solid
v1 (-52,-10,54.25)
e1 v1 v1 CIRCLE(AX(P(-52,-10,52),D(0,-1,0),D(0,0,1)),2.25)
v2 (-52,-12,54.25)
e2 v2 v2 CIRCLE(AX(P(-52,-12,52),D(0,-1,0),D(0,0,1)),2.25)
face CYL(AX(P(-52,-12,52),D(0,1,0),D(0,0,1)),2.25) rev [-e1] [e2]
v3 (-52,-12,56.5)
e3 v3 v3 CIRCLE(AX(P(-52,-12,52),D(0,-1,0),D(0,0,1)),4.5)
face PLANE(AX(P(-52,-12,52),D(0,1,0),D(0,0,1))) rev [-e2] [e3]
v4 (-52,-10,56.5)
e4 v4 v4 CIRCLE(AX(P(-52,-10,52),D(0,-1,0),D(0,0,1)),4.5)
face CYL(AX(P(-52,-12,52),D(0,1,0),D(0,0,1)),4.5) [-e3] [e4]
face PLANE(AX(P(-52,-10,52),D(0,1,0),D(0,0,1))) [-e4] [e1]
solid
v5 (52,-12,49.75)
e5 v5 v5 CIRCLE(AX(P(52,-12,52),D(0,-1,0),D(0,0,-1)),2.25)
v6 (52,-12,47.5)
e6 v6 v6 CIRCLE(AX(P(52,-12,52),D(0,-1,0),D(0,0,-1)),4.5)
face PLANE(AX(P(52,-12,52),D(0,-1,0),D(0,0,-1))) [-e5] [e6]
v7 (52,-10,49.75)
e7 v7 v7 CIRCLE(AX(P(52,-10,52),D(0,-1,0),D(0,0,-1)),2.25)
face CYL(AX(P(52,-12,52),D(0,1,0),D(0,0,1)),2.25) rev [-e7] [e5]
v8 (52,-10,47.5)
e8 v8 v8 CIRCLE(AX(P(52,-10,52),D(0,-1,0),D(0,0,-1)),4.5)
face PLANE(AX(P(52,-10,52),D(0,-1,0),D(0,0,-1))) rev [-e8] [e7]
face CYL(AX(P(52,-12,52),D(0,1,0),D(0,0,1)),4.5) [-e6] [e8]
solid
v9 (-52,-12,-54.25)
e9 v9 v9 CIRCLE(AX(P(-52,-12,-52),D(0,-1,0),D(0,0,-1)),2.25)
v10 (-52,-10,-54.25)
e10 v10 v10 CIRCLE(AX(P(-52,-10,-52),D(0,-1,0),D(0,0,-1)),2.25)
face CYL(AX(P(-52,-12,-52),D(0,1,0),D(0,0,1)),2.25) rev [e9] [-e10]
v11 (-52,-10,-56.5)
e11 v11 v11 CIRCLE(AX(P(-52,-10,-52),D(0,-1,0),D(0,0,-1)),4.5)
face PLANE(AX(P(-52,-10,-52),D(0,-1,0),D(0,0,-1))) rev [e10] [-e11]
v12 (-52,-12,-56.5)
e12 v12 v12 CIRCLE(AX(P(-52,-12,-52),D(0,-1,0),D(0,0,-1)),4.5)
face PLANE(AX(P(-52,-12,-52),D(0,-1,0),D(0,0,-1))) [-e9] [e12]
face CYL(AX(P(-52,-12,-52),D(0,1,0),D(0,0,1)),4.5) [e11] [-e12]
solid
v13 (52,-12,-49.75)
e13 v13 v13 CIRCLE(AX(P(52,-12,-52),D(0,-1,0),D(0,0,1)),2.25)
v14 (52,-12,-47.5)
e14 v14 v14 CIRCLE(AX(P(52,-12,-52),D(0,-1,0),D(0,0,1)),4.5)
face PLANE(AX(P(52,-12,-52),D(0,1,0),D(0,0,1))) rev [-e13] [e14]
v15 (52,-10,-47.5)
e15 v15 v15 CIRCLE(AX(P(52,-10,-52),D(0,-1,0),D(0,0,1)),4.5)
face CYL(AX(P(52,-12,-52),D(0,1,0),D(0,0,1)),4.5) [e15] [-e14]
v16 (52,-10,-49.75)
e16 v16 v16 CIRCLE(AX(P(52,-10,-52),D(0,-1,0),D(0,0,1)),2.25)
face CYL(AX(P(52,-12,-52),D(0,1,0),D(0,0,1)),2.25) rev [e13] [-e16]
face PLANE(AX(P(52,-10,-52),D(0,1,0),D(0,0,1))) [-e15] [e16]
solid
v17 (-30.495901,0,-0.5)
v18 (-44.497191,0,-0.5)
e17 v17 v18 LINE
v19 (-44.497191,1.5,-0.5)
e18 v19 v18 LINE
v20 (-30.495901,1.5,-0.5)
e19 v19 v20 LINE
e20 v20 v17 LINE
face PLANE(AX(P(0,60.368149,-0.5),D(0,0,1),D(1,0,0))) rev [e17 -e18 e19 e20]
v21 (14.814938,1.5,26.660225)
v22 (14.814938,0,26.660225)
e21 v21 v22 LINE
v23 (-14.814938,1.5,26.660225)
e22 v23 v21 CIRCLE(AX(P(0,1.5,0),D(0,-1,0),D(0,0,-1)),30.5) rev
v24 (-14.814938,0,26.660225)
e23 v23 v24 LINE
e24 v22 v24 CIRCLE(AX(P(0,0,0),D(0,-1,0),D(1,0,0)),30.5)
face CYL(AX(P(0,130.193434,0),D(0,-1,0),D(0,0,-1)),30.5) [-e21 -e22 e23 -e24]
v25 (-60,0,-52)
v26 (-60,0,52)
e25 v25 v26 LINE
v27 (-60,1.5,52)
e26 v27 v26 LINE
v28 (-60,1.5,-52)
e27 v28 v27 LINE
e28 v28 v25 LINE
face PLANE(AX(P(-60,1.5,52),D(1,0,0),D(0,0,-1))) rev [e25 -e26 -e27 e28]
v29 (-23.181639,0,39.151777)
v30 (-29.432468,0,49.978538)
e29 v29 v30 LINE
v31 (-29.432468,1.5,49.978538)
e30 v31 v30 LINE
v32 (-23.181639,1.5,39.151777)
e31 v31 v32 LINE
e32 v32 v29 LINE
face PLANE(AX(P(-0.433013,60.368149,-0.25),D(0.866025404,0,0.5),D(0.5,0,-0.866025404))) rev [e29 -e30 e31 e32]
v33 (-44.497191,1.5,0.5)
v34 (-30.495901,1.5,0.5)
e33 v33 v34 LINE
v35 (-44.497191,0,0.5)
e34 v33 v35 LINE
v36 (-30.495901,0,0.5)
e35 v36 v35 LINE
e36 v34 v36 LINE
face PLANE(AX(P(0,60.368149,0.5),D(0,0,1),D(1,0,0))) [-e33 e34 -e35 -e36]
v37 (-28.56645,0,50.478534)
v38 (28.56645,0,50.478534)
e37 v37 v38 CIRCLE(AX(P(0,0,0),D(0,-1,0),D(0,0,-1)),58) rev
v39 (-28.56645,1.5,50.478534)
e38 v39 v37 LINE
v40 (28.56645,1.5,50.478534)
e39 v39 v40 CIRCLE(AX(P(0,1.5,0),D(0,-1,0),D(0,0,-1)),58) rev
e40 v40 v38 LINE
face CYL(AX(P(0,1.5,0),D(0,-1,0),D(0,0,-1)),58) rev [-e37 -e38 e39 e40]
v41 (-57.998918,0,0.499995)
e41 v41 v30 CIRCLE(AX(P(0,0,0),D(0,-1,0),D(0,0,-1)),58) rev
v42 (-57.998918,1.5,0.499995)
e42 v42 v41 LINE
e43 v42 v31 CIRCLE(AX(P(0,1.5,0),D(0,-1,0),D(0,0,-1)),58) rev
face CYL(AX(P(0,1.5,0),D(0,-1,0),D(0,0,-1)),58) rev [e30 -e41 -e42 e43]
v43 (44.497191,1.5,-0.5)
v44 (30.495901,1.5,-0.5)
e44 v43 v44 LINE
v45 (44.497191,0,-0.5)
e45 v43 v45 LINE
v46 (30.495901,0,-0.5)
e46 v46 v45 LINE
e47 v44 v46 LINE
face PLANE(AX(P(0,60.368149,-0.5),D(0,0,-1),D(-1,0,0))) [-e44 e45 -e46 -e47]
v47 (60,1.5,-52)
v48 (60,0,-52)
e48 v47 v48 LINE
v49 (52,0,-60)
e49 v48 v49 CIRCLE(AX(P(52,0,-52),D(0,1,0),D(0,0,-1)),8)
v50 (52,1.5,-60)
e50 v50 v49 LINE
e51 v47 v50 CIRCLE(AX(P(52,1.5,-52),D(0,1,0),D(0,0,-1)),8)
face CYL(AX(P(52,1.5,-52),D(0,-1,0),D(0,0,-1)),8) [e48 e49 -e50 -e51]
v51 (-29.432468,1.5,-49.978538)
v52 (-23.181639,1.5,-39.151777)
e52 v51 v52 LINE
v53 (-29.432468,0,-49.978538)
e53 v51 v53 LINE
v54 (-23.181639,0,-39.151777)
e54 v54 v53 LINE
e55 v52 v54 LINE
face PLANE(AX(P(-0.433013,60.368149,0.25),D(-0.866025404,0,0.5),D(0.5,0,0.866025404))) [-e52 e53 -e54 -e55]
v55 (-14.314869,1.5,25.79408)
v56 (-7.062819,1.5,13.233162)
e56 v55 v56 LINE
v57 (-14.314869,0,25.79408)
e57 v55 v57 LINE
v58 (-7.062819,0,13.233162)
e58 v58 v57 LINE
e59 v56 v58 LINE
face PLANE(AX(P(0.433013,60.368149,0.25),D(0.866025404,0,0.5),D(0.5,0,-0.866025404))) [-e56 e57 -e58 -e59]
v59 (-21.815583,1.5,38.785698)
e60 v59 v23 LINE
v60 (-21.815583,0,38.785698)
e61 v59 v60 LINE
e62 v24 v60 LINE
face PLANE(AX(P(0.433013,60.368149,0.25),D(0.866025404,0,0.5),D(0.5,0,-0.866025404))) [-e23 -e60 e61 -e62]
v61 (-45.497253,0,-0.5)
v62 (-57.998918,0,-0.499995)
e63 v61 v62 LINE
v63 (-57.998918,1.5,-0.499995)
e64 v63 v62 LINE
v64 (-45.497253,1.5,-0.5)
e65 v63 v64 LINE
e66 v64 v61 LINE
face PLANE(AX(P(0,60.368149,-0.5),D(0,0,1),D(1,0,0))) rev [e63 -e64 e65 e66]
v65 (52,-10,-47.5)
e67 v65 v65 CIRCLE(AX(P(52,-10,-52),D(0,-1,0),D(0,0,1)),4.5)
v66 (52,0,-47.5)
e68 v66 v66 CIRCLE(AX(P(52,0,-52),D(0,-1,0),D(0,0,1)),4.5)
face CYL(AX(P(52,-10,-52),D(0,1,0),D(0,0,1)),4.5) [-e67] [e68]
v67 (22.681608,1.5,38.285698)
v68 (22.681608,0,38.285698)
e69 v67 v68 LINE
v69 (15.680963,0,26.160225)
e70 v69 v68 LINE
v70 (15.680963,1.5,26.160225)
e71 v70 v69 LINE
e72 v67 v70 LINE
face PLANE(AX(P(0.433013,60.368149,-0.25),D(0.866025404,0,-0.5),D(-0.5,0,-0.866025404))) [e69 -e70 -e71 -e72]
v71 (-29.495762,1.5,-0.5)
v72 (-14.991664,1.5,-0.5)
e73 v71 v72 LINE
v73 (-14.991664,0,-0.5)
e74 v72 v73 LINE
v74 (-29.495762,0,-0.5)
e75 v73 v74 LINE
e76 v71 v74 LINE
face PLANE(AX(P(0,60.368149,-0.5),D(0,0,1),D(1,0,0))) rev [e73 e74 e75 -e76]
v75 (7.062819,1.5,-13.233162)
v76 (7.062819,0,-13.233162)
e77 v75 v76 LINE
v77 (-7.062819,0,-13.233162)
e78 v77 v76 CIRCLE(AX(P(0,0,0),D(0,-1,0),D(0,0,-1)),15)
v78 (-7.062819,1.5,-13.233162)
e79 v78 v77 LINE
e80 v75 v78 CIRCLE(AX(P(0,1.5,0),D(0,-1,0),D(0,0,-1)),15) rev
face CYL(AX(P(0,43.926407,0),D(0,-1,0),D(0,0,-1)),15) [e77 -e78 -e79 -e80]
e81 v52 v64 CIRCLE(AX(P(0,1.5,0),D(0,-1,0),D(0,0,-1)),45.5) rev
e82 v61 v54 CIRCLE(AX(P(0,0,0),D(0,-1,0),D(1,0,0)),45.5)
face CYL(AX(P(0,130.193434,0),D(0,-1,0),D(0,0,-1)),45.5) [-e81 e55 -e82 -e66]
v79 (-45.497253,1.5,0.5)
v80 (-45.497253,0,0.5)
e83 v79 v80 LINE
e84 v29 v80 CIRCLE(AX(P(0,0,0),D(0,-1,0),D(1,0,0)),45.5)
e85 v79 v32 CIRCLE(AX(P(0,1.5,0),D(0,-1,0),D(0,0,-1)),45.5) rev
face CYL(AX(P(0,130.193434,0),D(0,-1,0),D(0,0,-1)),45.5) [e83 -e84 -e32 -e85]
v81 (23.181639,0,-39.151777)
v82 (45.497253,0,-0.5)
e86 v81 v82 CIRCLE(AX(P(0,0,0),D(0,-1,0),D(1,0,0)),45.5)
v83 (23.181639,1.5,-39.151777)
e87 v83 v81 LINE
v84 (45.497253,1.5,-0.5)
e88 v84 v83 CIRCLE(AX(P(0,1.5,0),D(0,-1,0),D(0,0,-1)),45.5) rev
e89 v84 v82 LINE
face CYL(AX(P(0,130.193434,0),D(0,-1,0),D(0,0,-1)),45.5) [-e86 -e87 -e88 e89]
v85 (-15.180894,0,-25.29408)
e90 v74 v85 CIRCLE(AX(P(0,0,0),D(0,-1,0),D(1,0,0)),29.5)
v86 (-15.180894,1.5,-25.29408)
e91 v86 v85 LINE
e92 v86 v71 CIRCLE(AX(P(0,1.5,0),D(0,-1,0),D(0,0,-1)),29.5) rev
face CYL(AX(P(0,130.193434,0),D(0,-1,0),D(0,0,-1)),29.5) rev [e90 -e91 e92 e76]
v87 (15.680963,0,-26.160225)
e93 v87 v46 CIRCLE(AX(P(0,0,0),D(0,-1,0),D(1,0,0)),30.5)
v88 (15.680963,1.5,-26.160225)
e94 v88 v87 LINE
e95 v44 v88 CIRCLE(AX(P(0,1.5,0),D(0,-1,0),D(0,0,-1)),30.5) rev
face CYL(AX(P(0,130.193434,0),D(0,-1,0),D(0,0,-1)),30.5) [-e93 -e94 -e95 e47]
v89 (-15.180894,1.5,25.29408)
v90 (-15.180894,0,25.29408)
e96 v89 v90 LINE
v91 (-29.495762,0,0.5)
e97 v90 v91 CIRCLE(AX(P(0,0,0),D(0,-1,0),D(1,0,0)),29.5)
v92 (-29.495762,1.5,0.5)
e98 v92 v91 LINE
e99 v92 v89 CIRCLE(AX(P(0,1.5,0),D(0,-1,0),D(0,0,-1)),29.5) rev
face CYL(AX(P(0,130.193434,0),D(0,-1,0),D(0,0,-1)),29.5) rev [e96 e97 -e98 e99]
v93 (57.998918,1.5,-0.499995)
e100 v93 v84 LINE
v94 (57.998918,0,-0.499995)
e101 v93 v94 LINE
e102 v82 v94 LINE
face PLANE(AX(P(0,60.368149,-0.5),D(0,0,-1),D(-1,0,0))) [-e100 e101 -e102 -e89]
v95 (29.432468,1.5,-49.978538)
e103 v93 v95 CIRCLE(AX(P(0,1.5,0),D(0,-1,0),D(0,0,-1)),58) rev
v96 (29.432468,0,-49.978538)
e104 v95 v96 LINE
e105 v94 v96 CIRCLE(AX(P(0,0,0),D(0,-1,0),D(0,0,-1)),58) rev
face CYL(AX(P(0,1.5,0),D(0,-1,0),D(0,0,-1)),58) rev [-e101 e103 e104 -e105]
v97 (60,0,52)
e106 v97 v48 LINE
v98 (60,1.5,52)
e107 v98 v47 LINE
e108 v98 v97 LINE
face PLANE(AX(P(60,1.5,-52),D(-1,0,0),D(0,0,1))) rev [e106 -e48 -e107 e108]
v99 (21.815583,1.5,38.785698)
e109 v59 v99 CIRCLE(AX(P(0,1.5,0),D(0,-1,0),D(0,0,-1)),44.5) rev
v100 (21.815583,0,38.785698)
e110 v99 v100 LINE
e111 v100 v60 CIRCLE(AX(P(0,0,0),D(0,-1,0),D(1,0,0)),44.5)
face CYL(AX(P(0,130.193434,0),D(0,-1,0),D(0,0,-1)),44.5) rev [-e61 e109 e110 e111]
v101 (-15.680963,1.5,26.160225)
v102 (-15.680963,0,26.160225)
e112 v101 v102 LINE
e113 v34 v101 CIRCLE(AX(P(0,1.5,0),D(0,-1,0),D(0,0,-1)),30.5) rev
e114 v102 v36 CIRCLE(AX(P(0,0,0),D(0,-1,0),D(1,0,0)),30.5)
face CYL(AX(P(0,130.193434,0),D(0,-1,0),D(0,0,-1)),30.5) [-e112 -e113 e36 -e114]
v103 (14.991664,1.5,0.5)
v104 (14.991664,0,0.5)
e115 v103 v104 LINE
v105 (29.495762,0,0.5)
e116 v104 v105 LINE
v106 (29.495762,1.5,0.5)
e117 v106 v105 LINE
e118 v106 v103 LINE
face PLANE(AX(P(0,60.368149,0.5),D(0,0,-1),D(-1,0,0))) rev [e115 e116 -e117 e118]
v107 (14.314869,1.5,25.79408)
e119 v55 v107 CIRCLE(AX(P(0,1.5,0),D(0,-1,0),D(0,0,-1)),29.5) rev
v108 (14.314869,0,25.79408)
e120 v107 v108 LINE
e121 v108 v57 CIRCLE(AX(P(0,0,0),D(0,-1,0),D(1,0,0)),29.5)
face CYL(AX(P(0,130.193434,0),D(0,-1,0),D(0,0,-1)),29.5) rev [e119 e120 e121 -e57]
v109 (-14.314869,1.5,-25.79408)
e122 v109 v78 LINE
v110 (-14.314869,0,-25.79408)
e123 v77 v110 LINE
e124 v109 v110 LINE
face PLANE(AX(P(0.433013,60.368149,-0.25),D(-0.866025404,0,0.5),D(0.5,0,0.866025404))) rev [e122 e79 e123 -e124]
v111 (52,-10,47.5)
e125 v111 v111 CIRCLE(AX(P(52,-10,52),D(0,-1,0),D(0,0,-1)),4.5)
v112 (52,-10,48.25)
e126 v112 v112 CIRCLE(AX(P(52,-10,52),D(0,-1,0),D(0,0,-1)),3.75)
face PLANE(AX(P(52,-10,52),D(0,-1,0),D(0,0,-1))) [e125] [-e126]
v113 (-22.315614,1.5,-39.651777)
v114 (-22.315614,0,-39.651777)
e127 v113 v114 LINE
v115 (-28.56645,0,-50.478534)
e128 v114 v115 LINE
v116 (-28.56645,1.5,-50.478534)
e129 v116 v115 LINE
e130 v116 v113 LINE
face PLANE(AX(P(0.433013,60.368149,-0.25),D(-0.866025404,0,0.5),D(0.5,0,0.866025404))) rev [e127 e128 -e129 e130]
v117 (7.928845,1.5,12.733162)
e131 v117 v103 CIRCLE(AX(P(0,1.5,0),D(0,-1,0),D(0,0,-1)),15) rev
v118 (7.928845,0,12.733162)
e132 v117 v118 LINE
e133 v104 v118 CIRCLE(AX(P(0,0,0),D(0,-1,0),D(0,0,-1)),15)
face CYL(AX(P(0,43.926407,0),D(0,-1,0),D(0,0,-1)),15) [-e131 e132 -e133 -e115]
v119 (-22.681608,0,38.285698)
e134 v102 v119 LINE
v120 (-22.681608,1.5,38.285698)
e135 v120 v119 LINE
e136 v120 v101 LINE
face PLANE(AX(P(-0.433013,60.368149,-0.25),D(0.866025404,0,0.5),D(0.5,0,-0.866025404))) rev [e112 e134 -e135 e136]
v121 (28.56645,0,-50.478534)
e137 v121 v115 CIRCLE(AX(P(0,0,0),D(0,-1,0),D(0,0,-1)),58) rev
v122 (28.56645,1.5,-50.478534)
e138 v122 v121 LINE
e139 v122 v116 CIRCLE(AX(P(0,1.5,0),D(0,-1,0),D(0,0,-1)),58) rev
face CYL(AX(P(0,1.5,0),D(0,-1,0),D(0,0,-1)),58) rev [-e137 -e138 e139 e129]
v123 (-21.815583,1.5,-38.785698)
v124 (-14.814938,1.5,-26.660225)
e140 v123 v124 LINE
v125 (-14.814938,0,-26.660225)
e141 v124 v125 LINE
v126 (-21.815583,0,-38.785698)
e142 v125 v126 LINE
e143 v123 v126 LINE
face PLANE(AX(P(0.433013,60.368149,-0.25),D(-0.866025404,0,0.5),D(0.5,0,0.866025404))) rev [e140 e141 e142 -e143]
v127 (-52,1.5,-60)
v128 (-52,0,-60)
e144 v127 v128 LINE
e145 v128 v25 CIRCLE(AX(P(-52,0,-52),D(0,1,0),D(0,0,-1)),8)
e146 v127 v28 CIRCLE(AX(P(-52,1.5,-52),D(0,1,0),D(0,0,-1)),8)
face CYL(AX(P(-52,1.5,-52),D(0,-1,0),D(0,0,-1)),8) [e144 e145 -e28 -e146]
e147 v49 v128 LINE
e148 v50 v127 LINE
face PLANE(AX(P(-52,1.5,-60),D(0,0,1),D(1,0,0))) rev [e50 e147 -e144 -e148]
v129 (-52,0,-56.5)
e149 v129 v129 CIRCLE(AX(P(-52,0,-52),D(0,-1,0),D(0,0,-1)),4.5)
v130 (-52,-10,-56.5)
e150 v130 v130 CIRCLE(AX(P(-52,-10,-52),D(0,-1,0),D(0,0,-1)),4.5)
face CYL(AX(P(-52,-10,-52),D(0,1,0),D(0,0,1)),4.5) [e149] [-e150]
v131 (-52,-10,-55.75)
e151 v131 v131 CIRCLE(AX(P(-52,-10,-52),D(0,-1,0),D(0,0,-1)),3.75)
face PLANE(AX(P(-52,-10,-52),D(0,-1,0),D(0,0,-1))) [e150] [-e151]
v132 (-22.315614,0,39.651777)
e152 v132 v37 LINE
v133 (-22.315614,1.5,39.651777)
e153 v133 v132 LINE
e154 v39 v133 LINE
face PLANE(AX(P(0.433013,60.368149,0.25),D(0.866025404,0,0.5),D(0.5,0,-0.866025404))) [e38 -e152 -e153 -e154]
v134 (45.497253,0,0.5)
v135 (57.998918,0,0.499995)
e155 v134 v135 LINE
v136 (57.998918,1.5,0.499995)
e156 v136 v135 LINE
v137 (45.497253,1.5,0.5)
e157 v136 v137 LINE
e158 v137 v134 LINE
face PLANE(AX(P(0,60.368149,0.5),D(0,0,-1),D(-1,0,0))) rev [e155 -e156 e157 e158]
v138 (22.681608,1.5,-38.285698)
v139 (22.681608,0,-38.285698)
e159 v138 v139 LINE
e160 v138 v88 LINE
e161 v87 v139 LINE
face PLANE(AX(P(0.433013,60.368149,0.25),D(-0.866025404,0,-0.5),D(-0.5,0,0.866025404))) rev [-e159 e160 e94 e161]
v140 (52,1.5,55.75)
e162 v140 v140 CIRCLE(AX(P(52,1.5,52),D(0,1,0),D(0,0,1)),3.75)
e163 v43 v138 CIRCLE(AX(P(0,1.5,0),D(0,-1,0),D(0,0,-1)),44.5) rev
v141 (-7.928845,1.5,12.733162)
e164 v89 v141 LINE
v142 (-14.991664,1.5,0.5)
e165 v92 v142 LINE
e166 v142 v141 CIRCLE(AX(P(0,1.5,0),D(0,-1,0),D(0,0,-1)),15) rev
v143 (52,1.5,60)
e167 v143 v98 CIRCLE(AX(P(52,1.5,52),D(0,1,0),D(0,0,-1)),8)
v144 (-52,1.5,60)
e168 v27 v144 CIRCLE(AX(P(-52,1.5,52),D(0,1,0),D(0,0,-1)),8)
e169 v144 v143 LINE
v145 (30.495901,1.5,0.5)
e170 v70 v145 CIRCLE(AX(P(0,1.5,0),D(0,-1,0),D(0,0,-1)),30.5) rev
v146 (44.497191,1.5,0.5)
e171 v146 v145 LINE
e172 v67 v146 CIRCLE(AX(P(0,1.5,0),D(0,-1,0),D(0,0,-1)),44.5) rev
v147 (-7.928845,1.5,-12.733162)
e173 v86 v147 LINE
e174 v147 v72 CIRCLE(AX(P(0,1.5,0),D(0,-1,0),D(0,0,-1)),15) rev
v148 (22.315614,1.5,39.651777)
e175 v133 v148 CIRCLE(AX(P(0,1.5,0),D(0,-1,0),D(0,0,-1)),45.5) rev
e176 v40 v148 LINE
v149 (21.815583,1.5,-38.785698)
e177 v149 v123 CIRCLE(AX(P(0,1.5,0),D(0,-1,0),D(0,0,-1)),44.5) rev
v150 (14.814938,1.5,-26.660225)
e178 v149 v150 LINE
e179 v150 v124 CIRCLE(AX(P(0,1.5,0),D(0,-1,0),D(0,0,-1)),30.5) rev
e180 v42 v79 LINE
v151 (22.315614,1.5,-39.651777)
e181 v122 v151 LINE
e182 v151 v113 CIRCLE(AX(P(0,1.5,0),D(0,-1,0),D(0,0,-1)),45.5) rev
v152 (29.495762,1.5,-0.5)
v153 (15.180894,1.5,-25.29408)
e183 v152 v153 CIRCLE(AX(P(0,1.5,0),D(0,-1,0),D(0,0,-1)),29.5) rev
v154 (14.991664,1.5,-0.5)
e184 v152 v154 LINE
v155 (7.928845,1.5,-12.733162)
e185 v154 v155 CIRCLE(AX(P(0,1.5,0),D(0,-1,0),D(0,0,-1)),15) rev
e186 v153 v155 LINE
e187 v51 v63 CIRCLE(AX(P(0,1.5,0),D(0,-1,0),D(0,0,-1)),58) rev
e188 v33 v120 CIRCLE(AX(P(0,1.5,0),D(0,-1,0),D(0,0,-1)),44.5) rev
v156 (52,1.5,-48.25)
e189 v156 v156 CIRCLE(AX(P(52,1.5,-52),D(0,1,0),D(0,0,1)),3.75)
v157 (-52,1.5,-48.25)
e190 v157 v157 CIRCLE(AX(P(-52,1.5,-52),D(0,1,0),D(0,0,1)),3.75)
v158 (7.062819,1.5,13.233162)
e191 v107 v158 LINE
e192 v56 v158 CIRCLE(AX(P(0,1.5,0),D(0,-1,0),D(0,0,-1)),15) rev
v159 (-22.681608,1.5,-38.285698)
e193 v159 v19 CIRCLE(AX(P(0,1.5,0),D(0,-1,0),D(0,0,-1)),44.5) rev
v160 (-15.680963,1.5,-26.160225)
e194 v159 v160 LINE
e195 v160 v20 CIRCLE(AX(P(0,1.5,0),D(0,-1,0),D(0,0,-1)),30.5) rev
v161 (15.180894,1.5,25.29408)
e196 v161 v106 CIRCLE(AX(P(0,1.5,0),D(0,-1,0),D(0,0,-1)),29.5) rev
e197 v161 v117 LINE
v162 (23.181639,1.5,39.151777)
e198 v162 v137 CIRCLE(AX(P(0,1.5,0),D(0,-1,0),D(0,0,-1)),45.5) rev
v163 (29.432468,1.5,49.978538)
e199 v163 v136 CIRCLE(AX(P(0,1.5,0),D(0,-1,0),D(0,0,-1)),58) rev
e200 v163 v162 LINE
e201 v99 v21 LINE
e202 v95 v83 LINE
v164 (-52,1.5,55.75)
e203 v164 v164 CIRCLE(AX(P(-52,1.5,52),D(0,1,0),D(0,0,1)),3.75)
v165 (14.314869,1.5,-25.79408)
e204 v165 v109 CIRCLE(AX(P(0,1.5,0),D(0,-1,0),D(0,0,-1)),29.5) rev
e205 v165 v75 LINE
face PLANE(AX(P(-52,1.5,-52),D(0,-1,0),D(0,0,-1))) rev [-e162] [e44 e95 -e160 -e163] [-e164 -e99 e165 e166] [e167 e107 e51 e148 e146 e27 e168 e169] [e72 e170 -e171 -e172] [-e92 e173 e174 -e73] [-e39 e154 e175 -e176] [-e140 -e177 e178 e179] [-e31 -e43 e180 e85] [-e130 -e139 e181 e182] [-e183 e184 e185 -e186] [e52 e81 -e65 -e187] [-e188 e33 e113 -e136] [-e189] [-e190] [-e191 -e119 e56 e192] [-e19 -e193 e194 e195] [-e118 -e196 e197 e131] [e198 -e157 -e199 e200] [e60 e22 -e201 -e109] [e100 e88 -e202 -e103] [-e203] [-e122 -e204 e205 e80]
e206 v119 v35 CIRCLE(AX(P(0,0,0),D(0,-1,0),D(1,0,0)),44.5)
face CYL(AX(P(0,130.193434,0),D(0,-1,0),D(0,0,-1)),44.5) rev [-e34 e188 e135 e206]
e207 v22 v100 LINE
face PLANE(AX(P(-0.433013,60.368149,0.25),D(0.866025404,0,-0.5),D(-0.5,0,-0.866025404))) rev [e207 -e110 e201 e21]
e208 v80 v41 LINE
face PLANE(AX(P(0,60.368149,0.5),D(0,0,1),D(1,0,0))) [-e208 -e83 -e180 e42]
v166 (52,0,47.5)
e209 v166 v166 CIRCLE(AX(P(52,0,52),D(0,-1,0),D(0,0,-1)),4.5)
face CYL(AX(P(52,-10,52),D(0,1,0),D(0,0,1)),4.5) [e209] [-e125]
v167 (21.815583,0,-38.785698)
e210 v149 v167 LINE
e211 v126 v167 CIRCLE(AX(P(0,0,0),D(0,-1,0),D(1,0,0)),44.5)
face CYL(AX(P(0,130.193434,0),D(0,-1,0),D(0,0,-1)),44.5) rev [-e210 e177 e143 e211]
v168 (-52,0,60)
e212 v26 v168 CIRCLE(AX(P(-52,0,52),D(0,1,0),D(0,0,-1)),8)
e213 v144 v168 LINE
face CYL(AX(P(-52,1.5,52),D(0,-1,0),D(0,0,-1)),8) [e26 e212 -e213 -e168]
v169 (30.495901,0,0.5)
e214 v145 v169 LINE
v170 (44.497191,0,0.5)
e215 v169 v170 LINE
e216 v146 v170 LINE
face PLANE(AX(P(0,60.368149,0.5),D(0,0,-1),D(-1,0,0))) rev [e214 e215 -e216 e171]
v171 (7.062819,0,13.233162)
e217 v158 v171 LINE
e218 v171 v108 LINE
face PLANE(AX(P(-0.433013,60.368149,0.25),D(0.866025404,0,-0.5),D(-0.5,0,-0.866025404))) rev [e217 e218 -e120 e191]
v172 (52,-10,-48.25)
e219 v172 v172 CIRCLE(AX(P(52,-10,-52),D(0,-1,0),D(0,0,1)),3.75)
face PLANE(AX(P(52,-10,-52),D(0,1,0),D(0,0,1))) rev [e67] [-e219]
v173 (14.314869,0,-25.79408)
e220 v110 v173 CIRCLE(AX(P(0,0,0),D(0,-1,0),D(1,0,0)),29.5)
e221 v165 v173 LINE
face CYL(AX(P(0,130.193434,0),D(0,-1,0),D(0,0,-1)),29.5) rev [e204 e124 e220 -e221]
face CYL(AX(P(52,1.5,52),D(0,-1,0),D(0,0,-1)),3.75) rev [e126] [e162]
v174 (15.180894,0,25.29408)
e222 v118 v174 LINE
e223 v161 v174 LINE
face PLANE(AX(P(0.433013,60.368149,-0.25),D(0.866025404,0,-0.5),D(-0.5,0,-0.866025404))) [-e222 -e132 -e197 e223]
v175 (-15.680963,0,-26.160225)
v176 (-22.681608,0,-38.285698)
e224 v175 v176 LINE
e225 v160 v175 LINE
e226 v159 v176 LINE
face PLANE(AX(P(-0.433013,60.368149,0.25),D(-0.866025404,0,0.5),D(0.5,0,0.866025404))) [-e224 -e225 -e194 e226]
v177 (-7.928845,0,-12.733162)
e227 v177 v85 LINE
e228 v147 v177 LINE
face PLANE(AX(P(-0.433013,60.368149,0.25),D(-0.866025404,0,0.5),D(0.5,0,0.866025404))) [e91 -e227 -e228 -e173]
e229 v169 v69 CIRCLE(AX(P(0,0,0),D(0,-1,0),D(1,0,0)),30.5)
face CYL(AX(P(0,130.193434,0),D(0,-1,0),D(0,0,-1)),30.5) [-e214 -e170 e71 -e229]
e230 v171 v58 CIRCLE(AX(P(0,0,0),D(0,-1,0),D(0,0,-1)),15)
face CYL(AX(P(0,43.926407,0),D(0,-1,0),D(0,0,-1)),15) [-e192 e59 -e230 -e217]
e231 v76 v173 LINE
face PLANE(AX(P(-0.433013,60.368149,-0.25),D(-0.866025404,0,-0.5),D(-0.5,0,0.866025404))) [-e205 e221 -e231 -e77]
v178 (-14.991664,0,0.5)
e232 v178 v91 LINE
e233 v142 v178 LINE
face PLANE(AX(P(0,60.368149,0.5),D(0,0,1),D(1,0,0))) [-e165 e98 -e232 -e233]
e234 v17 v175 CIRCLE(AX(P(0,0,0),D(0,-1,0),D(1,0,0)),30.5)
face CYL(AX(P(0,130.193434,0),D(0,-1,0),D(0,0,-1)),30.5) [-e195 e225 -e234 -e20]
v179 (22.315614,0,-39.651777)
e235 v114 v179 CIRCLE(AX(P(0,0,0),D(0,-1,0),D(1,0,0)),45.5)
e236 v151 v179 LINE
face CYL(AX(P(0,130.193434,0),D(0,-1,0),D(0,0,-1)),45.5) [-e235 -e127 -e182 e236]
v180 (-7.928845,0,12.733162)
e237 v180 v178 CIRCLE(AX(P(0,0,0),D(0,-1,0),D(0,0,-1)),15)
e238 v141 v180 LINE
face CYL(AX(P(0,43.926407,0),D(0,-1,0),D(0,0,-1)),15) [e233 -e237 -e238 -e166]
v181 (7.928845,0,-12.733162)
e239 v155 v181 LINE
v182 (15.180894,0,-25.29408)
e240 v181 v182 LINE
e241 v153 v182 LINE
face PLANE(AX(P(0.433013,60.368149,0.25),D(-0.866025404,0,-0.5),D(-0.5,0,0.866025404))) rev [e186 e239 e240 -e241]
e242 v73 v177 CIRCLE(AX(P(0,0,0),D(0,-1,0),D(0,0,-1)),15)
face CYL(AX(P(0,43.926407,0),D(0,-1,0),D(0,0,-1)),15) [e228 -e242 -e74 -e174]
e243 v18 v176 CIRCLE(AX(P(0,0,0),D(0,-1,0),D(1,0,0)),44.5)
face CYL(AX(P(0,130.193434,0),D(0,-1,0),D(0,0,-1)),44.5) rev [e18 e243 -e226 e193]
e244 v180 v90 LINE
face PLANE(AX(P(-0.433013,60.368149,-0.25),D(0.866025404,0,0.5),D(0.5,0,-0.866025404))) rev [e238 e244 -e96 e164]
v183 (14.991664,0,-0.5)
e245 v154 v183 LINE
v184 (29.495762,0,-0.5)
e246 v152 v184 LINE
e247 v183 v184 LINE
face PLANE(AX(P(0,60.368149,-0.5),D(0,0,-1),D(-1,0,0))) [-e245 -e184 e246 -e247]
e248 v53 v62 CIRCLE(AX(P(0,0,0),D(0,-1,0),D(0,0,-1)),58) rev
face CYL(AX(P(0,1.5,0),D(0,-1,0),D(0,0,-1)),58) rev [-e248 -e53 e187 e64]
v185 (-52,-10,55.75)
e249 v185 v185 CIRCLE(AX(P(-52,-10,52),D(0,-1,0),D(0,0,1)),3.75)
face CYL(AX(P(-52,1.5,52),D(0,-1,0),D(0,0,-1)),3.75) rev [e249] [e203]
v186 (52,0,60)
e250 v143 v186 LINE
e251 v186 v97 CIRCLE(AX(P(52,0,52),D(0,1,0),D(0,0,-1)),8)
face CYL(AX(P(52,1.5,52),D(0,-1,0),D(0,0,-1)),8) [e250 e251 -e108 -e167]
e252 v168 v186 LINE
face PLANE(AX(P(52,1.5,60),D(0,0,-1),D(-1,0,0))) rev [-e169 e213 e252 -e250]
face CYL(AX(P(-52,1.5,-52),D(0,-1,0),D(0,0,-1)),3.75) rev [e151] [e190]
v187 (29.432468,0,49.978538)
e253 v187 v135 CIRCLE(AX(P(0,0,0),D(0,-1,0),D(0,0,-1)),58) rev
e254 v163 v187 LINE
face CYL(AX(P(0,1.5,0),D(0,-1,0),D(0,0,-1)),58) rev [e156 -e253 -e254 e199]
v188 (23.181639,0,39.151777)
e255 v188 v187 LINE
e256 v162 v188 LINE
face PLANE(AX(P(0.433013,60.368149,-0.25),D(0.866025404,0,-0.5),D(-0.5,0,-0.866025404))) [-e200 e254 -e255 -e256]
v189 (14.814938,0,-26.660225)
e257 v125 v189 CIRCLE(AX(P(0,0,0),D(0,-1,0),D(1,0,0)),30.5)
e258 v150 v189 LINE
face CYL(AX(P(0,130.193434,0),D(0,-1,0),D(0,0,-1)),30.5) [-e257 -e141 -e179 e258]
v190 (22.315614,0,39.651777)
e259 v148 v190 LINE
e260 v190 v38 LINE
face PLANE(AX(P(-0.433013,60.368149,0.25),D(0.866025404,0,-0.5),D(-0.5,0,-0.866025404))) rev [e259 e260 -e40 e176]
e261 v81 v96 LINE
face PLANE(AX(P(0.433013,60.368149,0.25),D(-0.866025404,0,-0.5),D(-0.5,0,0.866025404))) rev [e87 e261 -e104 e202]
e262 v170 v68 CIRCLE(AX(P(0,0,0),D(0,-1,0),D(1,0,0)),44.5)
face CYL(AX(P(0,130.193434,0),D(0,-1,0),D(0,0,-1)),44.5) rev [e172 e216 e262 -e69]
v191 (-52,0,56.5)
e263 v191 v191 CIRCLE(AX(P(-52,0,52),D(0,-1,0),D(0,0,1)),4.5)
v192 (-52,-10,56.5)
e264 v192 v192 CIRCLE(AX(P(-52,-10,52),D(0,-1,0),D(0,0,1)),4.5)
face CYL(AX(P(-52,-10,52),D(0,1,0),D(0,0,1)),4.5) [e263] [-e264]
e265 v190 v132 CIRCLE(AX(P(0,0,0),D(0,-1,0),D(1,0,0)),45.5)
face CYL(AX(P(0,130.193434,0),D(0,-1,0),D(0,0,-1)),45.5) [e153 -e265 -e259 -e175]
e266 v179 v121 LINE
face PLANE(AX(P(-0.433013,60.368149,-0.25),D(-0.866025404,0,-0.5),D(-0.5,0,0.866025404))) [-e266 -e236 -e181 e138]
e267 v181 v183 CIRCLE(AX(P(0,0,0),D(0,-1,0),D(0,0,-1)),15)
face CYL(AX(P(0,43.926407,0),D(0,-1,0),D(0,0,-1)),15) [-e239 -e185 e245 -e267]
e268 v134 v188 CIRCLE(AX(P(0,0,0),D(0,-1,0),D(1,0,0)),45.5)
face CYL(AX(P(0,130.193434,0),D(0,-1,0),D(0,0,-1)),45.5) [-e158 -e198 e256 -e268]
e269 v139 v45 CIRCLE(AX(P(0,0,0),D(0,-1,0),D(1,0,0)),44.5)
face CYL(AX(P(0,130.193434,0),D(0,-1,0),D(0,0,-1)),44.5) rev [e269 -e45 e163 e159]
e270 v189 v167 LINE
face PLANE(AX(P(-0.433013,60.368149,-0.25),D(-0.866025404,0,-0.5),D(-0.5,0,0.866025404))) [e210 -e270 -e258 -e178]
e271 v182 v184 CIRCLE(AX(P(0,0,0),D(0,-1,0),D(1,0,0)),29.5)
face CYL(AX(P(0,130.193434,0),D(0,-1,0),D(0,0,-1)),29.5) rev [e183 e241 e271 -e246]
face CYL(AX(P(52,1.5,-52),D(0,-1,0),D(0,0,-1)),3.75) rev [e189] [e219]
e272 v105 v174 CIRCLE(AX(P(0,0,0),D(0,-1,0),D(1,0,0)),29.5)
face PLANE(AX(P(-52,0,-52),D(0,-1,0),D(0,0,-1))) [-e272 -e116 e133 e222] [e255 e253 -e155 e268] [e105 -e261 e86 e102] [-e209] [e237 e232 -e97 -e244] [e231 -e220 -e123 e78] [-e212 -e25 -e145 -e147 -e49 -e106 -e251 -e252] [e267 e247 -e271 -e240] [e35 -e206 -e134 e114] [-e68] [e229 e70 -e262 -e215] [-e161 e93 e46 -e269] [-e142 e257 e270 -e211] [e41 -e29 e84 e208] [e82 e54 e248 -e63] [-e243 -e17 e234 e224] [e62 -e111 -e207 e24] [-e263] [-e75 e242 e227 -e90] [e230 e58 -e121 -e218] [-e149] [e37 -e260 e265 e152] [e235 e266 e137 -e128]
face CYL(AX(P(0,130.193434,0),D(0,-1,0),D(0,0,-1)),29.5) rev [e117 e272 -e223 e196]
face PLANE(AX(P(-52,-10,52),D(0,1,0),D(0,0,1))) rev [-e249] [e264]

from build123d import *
from build123d.topology import SkipClean

# Parameters (mm, degrees)
SKETCH_1_R        = 3.75
SKETCH_1_R_2      = 58
EXTRUDE_1_DEPTH   = 1.5
EXTRUDE_START     = -1.5
EXTRUDE_1_2_DEPTH = 1.5
EXTRUDE_2_DEPTH   = 1.5
EXTRUDE_START_2   = 10
SKETCH_3_R        = 4.5
SKETCH_3_R_2      = 3.75
EXTRUDE_3_DEPTH   = 10
SKETCH_4_R        = 4.5
SKETCH_4_R_2      = 2.25
EXTRUDE_4_DEPTH   = 2
EXTRUDE_4_2_DEPTH = 2
EXTRUDE_4_3_DEPTH = 2
EXTRUDE_4_4_DEPTH = 2


# Read off the part's stored shape, not the designer's step: 拉伸-薄壁1
with BuildPart() as part:
    # 草图1 → Extrude 1 (new body)
    with BuildSketch(Plane(origin=(0, 0, 0), x_dir=(1, 0, 0), z_dir=(0, 1, 0))):
        with BuildLine():
            Line((-52, 60), (52, 60))
            ThreePointArc((52, 60), (57.656854249, 57.656854249), (60, 52))
            Line((60, 52), (60, -52))
            ThreePointArc((60, -52), (57.656854249, -57.656854249), (52, -60))
            Line((52, -60), (-52, -60))
            ThreePointArc((-52, -60), (-57.656854249, -57.656854249), (-60, -52))
            Line((-60, -52), (-60, 52))
            ThreePointArc((-60, 52), (-57.656854249, 57.656854249), (-52, 60))
        make_face()
        with Locations(Location((52, 52, 0), (0, 0, 270))):
            Circle(SKETCH_1_R, mode=Mode.SUBTRACT)
        with Locations(Location((52, -52, 0), (0, 0, 270))):
            Circle(SKETCH_1_R, mode=Mode.SUBTRACT)
        with Locations(Location((-52, 52, 0), (0, 0, 270))):
            Circle(SKETCH_1_R, mode=Mode.SUBTRACT)
        with Locations(Location((-52, -52, 0), (0, 0, 270))):
            Circle(SKETCH_1_R, mode=Mode.SUBTRACT)
        with Locations(Location((0, 0, 0), (0, 0, 270))):
            Circle(SKETCH_1_R_2, mode=Mode.SUBTRACT)
    extrude(amount=EXTRUDE_1_DEPTH)

    # Extrude 1 2 outline → Extrude 1 2 (add)
    with BuildSketch(Plane.XZ.offset(EXTRUDE_START)):
        with BuildLine():
            Line((57.997844907, 0.499986102), (45.497252664, 0.5))
            ThreePointArc((45.497252664, 0.5), (39.404155872, 22.75), (23.181639034, 39.15177661))
            Line((23.181639034, 39.15177661), (29.431923607, 49.977613716))
            ThreePointArc((29.431923607, 49.977613716), (28.999999948, 50.229473449), (28.565921191, 50.477600443))
            Line((28.565921191, 50.477600443), (22.31561363, 39.65177661))
            ThreePointArc((22.31561363, 39.65177661), (0, 45.5), (-22.31561363, 39.65177661))
            Line((-22.31561363, 39.65177661), (-28.565921191, 50.477600443))
            ThreePointArc((-28.565921191, 50.477600443), (-28.999999948, 50.229473449), (-29.431923607, 49.977613716))
            Line((-29.431923607, 49.977613716), (-23.181639034, 39.15177661))
            ThreePointArc((-23.181639034, 39.15177661), (-39.404155872, 22.75), (-45.497252664, 0.5))
            Line((-45.497252664, 0.5), (-57.997844907, 0.499986102))
            ThreePointArc((-57.997844907, 0.499986102), (-58, 0), (-57.997844907, -0.499986102))
            Line((-57.997844907, -0.499986102), (-45.497252664, -0.5))
            ThreePointArc((-45.497252664, -0.5), (-39.404155872, -22.75), (-23.181639034, -39.15177661))
            Line((-23.181639034, -39.15177661), (-29.431923607, -49.977613716))
            ThreePointArc((-29.431923607, -49.977613716), (-28.999999948, -50.229473449), (-28.565921191, -50.477600443))
            Line((-28.565921191, -50.477600443), (-22.31561363, -39.65177661))
            ThreePointArc((-22.31561363, -39.65177661), (0, -45.5), (22.31561363, -39.65177661))
            Line((22.31561363, -39.65177661), (28.565921191, -50.477600443))
            ThreePointArc((28.565921191, -50.477600443), (28.999999948, -50.229473449), (29.431923607, -49.977613716))
            Line((29.431923607, -49.977613716), (23.181639034, -39.15177661))
            ThreePointArc((23.181639034, -39.15177661), (39.404155872, -22.75), (45.497252664, -0.5))
            Line((45.497252664, -0.5), (57.997844907, -0.499986102))
            ThreePointArc((57.997844907, -0.499986102), (58, 0), (57.997844907, 0.499986102))
        make_face()
        with BuildLine():
            Line((-44.497190923, -0.5), (-30.495901364, -0.5))
            ThreePointArc((-30.495901364, -0.5), (-26.413774815, -15.25), (-15.680963384, -26.160225292))
            Line((-15.680963384, -26.160225292), (-22.681608163, -38.285697736))
            ThreePointArc((-22.681608163, -38.285697736), (-38.538130468, -22.25), (-44.497190923, -0.5))
        make_face(mode=Mode.SUBTRACT)
        with BuildLine():
            Line((-29.495762408, -0.5), (-0.866025404, -0.5))
            Line((-0.866025404, -0.5), (-15.180893906, -25.294079549))
            ThreePointArc((-15.180893906, -25.294079549), (-25.547749412, -14.75), (-29.495762408, -0.5))
        make_face(mode=Mode.SUBTRACT)
        with BuildLine():
            ThreePointArc((21.815582759, -38.785697736), (0, -44.5), (-21.815582759, -38.785697736))
            Line((-21.815582759, -38.785697736), (-14.81493798, -26.660225292))
            ThreePointArc((-14.81493798, -26.660225292), (0, -30.5), (14.81493798, -26.660225292))
            Line((14.81493798, -26.660225292), (21.815582759, -38.785697736))
        make_face(mode=Mode.SUBTRACT)
        with BuildLine():
            Line((-14.314868502, -25.794079549), (0, -1))
            Line((0, -1), (14.314868502, -25.794079549))
            ThreePointArc((14.314868502, -25.794079549), (0, -29.5), (-14.314868502, -25.794079549))
        make_face(mode=Mode.SUBTRACT)
        with BuildLine():
            Line((15.180893906, -25.294079549), (0.866025404, -0.5))
            Line((0.866025404, -0.5), (29.495762408, -0.5))
            ThreePointArc((29.495762408, -0.5), (25.547749412, -14.75), (15.180893906, -25.294079549))
        make_face(mode=Mode.SUBTRACT)
        with BuildLine():
            ThreePointArc((15.680963384, -26.160225292), (26.413774815, -15.25), (30.495901364, -0.5))
            Line((30.495901364, -0.5), (44.497190923, -0.5))
            ThreePointArc((44.497190923, -0.5), (38.538130468, -22.25), (22.681608163, -38.285697736))
            Line((22.681608163, -38.285697736), (15.680963384, -26.160225292))
        make_face(mode=Mode.SUBTRACT)
        with BuildLine():
            ThreePointArc((-15.680963384, 26.160225292), (-26.413774815, 15.25), (-30.495901364, 0.5))
            Line((-30.495901364, 0.5), (-44.497190923, 0.5))
            ThreePointArc((-44.497190923, 0.5), (-38.538130468, 22.25), (-22.681608163, 38.285697736))
            Line((-22.681608163, 38.285697736), (-15.680963384, 26.160225292))
        make_face(mode=Mode.SUBTRACT)
        with BuildLine():
            Line((-15.180893906, 25.294079549), (-0.866025404, 0.5))
            Line((-0.866025404, 0.5), (-29.495762408, 0.5))
            ThreePointArc((-29.495762408, 0.5), (-25.547749412, 14.75), (-15.180893906, 25.294079549))
        make_face(mode=Mode.SUBTRACT)
        with BuildLine():
            Line((29.495762408, 0.5), (0.866025404, 0.5))
            Line((0.866025404, 0.5), (15.180893906, 25.294079549))
            ThreePointArc((15.180893906, 25.294079549), (25.547749412, 14.75), (29.495762408, 0.5))
        make_face(mode=Mode.SUBTRACT)
        with BuildLine():
            Line((14.314868502, 25.794079549), (0, 1))
            Line((0, 1), (-14.314868502, 25.794079549))
            ThreePointArc((-14.314868502, 25.794079549), (0, 29.5), (14.314868502, 25.794079549))
        make_face(mode=Mode.SUBTRACT)
        with BuildLine():
            Line((44.497190923, 0.5), (30.495901364, 0.5))
            ThreePointArc((30.495901364, 0.5), (26.413774815, 15.25), (15.680963384, 26.160225292))
            Line((15.680963384, 26.160225292), (22.681608163, 38.285697736))
            ThreePointArc((22.681608163, 38.285697736), (38.538130468, 22.25), (44.497190923, 0.5))
        make_face(mode=Mode.SUBTRACT)
        with BuildLine():
            ThreePointArc((-21.815582759, 38.785697736), (0, 44.5), (21.815582759, 38.785697736))
            Line((21.815582759, 38.785697736), (14.81493798, 26.660225292))
            ThreePointArc((14.81493798, 26.660225292), (0, 30.5), (-14.81493798, 26.660225292))
            Line((-14.81493798, 26.660225292), (-21.815582759, 38.785697736))
        make_face(mode=Mode.SUBTRACT)
    extrude(amount=EXTRUDE_1_2_DEPTH)

    # 草图2<3> → 凸台-拉伸2 (add)
    with BuildSketch(Plane.XZ):
        with BuildLine():
            Line((-7.5, -12.990381057), (0, 0))
            Line((0, 0), (-15, 0))
            ThreePointArc((-15, 0), (-12.990381057, -7.5), (-7.5, -12.990381057))
        make_face()
        with BuildLine():
            Line((7.5, -12.990381057), (0, 0))
            Line((0, 0), (-7.5, -12.990381057))
            ThreePointArc((-7.5, -12.990381057), (0, -15), (7.5, -12.990381057))
        make_face()
        with BuildLine():
            Line((15, 0), (0, 0))
            Line((0, 0), (7.5, -12.990381057))
            ThreePointArc((7.5, -12.990381057), (12.990381057, -7.5), (15, 0))
        make_face()
        with BuildLine():
            Line((7.5, 12.990381057), (0, 0))
            Line((0, 0), (15, 0))
            ThreePointArc((15, 0), (12.990381057, 7.5), (7.5, 12.990381057))
        make_face()
        with BuildLine():
            Line((-7.5, 12.990381057), (0, 0))
            Line((0, 0), (7.5, 12.990381057))
            ThreePointArc((7.5, 12.990381057), (0, 15), (-7.5, 12.990381057))
        make_face()
        with BuildLine():
            Line((-15, 0), (0, 0))
            Line((0, 0), (-7.5, 12.990381057))
            ThreePointArc((-7.5, 12.990381057), (-12.990381057, 7.5), (-15, 0))
        make_face()
    extrude(amount=-EXTRUDE_2_DEPTH)

    # 草图3 → 凸台-拉伸3 (add)
    # profile 1 of 4: a face of its own
    with SkipClean():  # the faces are left unmerged after this step: merging them gives an invalid solid
        with BuildSketch(Plane.XZ.offset(EXTRUDE_START_2)):
            with Locations(Location((52, 52, 0), (0, 0, 270))):
                Circle(SKETCH_3_R)
            with Locations(Location((52, 52, 0), (0, 0, 270))):
                Circle(SKETCH_3_R_2, mode=Mode.SUBTRACT)
        # profile 2 of 4: a face of its own
        with BuildSketch(Plane.XZ.offset(EXTRUDE_START_2)):
            with Locations(Location((52, -52, 0), (0, 0, 90))):
                Circle(SKETCH_3_R)
            with Locations(Location((52, -52, 0), (0, 0, 90))):
                Circle(SKETCH_3_R_2, mode=Mode.SUBTRACT)
        # profile 3 of 4: a face of its own
        with BuildSketch(Plane.XZ.offset(EXTRUDE_START_2)):
            with Locations(Location((-52, -52, 0), (0, 0, 270))):
                Circle(SKETCH_3_R)
            with Locations(Location((-52, -52, 0), (0, 0, 270))):
                Circle(SKETCH_3_R_2, mode=Mode.SUBTRACT)
        # profile 4 of 4: a face of its own
        with BuildSketch(Plane.XZ.offset(EXTRUDE_START_2)):
            with Locations(Location((-52, 52, 0), (0, 0, 90))):
                Circle(SKETCH_3_R)
            with Locations(Location((-52, 52, 0), (0, 0, 90))):
                Circle(SKETCH_3_R_2, mode=Mode.SUBTRACT)
        extrude(amount=-EXTRUDE_3_DEPTH)


with BuildPart() as body_2:
    # 草图4 → 凸台-拉伸4 (new body)
    with BuildSketch(Plane.XZ.offset(10)):
        with Locations(Location((52, 52, 0), (0, 0, 270))):
            Circle(SKETCH_4_R)
        with Locations(Location((52, 52, 0), (0, 0, 270))):
            Circle(SKETCH_4_R_2, mode=Mode.SUBTRACT)
    extrude(amount=EXTRUDE_4_DEPTH)


with BuildPart() as body_3:
    # 草图4 → Extrude 4 2 (new body)
    with BuildSketch(Plane.XZ.offset(10)):
        with Locations(Location((52, -52, 0), (0, 0, 90))):
            Circle(SKETCH_4_R)
        with Locations(Location((52, -52, 0), (0, 0, 90))):
            Circle(SKETCH_4_R_2, mode=Mode.SUBTRACT)
    extrude(amount=EXTRUDE_4_2_DEPTH)


with BuildPart() as body_4:
    # 草图4 → Extrude 4 3 (new body)
    with BuildSketch(Plane.XZ.offset(10)):
        with Locations(Location((-52, -52, 0), (0, 0, 270))):
            Circle(SKETCH_4_R)
        with Locations(Location((-52, -52, 0), (0, 0, 270))):
            Circle(SKETCH_4_R_2, mode=Mode.SUBTRACT)
    extrude(amount=EXTRUDE_4_3_DEPTH)


with BuildPart() as body_5:
    # 草图4 → Extrude 4 4 (new body)
    with BuildSketch(Plane.XZ.offset(10)):
        with Locations(Location((-52, 52, 0), (0, 0, 90))):
            Circle(SKETCH_4_R)
        with Locations(Location((-52, 52, 0), (0, 0, 90))):
            Circle(SKETCH_4_R_2, mode=Mode.SUBTRACT)
    extrude(amount=EXTRUDE_4_4_DEPTH)


solid = Compound([part.part, body_2.part, body_3.part, body_4.part, body_5.part])
